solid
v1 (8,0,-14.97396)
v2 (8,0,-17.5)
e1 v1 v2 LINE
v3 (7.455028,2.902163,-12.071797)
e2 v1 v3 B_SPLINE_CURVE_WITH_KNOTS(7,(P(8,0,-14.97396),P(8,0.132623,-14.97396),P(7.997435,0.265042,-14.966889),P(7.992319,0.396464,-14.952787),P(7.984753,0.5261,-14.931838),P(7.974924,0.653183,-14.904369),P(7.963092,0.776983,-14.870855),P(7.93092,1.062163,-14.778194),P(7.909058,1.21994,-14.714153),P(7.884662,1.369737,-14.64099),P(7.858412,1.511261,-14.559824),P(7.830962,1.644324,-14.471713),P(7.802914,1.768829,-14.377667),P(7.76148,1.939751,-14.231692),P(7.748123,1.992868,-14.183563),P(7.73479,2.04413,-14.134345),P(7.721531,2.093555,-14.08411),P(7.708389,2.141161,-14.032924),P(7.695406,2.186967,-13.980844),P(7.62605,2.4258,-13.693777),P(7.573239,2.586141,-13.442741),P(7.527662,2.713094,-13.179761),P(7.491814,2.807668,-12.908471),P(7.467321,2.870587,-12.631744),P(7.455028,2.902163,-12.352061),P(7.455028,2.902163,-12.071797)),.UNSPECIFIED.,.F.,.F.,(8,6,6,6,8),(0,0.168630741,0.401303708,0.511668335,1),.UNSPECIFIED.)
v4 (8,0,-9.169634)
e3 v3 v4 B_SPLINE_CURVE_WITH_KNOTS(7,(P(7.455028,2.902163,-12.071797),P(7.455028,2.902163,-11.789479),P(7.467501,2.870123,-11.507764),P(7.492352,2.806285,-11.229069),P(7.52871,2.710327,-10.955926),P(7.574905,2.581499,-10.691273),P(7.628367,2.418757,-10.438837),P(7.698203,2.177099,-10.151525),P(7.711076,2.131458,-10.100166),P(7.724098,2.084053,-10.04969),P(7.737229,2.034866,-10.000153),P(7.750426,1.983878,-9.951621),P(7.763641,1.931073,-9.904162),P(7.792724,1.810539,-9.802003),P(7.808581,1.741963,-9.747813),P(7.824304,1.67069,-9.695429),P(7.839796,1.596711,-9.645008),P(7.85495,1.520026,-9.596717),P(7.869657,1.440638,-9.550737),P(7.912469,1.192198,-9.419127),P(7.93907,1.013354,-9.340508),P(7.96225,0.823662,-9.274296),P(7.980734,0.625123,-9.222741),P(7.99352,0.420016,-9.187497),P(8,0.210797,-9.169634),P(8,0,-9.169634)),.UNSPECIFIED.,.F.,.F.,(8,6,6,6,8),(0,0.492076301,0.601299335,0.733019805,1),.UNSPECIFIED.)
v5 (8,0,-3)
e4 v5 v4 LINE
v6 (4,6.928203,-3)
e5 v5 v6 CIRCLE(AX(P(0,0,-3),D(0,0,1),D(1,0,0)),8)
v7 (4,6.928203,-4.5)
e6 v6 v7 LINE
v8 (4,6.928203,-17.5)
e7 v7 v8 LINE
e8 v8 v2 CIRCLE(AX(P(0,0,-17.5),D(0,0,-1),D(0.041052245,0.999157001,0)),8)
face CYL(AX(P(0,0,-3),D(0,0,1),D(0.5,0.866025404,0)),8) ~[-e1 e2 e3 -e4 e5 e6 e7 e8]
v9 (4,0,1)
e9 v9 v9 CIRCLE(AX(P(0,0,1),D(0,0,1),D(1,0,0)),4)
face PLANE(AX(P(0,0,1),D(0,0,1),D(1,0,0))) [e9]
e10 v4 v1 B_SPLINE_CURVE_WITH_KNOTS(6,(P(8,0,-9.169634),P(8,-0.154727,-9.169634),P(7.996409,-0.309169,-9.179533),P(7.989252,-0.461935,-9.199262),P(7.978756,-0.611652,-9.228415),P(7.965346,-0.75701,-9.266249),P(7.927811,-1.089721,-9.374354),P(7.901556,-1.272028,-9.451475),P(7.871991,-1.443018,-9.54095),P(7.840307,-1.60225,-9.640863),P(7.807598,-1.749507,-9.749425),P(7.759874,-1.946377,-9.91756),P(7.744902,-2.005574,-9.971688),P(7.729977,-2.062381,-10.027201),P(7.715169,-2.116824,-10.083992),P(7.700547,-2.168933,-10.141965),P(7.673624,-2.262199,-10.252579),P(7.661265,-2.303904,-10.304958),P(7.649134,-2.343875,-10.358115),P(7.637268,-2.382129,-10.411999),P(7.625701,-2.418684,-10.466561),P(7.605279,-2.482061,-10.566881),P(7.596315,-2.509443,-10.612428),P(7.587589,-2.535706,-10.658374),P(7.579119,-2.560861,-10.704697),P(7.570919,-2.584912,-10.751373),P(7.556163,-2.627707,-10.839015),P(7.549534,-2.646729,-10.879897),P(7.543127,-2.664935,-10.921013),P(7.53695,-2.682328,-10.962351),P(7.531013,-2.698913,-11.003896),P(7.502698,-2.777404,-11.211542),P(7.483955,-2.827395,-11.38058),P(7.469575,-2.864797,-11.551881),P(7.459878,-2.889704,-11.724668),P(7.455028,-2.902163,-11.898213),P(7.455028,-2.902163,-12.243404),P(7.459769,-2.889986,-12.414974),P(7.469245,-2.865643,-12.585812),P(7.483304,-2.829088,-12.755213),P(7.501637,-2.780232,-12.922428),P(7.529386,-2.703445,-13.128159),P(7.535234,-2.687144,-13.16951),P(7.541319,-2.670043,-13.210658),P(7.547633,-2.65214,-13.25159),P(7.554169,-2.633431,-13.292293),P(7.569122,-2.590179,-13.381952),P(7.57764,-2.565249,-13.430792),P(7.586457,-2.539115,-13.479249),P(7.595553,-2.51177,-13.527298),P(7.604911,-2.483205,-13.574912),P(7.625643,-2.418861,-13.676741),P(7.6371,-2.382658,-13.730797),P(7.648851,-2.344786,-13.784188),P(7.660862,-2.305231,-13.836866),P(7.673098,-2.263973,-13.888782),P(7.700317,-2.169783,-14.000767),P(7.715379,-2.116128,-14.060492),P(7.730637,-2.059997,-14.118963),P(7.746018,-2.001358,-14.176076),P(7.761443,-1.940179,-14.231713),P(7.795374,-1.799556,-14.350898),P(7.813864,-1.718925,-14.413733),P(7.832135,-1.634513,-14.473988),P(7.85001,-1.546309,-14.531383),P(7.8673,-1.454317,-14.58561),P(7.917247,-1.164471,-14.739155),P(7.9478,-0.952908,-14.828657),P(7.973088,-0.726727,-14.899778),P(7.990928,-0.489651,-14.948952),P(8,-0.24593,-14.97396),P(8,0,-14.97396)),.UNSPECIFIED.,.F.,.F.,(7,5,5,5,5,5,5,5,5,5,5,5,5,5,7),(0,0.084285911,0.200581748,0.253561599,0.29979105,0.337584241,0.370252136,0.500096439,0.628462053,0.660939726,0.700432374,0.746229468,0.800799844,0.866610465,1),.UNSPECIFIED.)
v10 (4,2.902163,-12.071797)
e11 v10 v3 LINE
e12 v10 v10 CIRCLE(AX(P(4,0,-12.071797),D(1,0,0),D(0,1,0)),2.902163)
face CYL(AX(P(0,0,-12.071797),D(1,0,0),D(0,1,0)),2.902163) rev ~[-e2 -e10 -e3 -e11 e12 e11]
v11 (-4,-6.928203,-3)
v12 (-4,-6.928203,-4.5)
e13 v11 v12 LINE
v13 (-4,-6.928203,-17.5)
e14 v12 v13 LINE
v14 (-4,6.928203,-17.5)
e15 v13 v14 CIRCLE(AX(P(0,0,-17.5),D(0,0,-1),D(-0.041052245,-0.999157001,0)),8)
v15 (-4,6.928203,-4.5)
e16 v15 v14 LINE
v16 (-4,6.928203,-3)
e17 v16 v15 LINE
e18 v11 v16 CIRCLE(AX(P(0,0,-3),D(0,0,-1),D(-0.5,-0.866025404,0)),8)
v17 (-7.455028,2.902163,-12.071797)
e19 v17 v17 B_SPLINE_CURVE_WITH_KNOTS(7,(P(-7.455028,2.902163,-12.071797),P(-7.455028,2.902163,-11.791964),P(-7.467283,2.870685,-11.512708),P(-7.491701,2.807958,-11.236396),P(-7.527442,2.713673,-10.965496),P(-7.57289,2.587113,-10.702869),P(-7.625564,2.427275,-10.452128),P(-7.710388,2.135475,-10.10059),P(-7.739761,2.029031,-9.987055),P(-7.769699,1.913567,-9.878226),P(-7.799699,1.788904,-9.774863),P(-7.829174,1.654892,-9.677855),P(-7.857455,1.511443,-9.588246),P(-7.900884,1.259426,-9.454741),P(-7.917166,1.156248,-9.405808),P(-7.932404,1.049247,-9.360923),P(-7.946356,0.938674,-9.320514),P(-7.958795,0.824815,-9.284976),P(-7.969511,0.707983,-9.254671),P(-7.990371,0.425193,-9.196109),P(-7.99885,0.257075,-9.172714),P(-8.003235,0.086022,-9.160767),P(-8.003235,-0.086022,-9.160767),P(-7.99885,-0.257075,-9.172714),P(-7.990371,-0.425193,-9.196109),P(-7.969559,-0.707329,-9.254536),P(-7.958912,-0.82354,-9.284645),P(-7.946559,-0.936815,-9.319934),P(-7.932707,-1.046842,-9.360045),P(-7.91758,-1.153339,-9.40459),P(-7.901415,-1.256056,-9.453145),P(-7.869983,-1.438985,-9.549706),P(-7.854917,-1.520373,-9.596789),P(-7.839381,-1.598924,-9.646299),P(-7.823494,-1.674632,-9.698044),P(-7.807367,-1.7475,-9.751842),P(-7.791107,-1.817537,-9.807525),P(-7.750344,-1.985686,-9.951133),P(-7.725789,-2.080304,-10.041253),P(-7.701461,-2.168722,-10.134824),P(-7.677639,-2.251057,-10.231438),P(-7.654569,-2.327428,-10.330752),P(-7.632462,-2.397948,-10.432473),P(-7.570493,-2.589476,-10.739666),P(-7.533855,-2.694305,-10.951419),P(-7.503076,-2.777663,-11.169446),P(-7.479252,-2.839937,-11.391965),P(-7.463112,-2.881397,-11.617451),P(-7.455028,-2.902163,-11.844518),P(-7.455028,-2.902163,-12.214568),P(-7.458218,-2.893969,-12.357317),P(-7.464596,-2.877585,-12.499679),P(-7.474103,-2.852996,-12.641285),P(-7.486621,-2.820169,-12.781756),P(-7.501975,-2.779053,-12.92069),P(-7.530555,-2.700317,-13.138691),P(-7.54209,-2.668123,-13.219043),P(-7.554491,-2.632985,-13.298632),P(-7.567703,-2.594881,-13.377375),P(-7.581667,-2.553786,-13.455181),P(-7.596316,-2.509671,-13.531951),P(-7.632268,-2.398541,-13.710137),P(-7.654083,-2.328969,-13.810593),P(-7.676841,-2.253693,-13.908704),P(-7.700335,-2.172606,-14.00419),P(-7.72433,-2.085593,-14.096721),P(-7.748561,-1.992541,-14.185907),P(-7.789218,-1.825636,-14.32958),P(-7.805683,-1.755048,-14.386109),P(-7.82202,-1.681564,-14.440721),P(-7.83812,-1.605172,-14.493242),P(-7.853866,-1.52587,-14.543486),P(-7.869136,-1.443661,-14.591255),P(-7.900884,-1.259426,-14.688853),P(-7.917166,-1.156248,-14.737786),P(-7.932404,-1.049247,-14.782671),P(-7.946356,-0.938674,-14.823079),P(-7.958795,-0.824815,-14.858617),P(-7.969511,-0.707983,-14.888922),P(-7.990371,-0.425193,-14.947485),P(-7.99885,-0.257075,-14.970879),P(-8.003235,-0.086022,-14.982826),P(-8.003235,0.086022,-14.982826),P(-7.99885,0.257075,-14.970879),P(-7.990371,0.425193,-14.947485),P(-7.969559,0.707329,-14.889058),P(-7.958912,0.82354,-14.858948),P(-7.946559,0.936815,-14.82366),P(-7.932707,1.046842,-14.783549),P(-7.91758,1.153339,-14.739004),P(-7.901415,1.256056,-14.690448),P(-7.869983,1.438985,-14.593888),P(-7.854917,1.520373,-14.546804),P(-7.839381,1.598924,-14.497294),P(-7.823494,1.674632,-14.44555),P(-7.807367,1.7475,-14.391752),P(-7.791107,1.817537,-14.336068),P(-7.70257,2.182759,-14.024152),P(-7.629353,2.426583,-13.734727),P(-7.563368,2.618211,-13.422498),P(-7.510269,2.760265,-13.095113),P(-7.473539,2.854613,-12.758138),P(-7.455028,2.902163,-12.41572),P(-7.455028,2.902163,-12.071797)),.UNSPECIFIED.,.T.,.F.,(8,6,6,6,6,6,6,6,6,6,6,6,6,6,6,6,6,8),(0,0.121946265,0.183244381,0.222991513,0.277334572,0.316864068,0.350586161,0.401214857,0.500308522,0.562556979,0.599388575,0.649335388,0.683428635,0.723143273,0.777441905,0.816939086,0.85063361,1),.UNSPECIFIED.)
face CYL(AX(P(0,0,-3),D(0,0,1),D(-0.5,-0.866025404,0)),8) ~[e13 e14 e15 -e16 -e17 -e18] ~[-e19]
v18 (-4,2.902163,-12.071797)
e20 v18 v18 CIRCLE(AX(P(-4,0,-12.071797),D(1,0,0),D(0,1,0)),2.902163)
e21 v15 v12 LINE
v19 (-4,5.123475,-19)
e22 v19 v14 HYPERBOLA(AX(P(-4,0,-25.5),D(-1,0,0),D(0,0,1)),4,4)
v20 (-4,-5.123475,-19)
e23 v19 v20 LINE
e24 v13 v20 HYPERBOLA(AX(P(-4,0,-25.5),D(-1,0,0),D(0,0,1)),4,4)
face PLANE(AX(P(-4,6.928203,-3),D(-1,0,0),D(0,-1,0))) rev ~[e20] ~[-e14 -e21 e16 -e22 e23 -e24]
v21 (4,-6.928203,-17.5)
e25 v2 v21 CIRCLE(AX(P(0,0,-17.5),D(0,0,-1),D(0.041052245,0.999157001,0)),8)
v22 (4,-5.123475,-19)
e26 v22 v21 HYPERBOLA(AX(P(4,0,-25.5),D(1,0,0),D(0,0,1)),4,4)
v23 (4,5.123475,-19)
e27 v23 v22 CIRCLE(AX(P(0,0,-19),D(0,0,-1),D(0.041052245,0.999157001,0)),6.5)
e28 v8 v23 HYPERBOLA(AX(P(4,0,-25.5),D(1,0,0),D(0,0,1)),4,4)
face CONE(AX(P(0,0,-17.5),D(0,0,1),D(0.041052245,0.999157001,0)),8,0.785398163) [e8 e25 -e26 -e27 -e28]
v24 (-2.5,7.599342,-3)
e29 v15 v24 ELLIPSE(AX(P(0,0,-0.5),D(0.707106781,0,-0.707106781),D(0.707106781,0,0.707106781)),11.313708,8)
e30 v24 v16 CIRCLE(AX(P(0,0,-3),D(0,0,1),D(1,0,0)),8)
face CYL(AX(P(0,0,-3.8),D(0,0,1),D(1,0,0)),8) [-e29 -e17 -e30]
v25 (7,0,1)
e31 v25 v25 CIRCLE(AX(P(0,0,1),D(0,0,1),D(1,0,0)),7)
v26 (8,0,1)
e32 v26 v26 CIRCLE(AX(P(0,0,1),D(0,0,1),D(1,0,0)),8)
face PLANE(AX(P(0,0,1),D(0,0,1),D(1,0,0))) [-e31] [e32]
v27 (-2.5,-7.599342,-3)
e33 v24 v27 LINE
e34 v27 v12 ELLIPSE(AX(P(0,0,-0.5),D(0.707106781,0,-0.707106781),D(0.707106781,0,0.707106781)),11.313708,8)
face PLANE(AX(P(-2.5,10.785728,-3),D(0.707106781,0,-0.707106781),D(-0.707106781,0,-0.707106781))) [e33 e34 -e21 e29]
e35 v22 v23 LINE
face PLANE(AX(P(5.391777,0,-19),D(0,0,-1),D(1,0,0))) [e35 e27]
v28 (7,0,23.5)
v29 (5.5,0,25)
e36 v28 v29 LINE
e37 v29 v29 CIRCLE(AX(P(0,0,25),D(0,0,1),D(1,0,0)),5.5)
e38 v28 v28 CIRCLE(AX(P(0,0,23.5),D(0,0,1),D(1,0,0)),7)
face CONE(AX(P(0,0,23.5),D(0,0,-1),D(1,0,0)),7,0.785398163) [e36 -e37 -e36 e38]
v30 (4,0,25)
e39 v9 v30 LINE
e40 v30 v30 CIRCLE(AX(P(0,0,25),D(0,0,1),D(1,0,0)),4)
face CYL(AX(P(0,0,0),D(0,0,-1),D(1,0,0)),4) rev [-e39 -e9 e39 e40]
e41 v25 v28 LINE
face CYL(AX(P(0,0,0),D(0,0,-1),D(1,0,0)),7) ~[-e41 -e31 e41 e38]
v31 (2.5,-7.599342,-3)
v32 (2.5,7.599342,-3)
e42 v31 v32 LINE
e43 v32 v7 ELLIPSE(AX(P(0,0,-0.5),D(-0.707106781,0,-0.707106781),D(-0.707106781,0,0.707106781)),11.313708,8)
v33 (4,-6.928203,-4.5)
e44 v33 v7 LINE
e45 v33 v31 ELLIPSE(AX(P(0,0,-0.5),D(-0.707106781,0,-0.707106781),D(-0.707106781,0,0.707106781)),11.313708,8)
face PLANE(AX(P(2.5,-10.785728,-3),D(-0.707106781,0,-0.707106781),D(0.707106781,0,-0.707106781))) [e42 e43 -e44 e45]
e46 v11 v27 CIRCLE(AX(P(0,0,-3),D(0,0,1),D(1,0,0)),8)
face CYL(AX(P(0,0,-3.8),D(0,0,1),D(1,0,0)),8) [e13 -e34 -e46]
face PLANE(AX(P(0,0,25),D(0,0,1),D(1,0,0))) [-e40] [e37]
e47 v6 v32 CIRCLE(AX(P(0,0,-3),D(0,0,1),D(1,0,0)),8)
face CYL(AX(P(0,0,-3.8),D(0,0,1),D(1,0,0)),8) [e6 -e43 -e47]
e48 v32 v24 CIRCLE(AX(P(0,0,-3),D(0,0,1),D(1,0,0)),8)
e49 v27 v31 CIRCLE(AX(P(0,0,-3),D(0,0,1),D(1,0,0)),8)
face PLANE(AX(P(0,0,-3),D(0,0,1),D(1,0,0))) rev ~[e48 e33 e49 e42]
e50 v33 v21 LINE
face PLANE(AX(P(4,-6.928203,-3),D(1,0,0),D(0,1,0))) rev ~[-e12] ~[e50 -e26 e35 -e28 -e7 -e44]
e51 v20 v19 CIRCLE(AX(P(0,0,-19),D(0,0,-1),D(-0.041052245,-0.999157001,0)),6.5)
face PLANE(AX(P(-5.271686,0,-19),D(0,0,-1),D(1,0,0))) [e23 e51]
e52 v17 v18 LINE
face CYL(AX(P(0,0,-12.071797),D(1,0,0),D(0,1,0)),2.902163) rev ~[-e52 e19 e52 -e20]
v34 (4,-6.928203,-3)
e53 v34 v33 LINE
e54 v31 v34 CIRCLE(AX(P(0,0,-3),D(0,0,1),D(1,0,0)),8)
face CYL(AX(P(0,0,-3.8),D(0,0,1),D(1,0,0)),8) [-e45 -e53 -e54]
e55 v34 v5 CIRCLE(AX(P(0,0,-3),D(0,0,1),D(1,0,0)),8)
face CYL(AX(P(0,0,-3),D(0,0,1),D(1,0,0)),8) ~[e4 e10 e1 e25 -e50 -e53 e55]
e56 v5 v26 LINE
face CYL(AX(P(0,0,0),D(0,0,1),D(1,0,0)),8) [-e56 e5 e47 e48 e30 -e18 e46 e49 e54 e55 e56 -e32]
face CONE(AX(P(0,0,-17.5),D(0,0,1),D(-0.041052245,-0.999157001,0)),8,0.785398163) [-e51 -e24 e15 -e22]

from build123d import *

# Parameters (mm, degrees)
F7_R          = 7
F7_R_2        = 4
F8_DEPTH      = 25
F9_DEPTH      = 1
F7_R_3        = 8
F10_DEPTH     = 1
F11_DEPTH     = 3
F13_DEPTH     = 16
F14_R         = 2.9021632183
F15_DEPTH     = 12.5
F16_T4_DEPTH  = 21.5714554244
F16_S5_R      = 8
F16_T6_DEPTH  = 12
F16_T10_DEPTH = 21.5714554244
F16_S11_R     = 8
F16_T12_DEPTH = 12
F16_T16_ANGLE = 175.2944368931
F16_T18_ANGLE = 175.2944368931


# Not quite as in the source:
# - a fillet or chamfer that OpenCascade refuses, or shapes differently, is made with other operations: its cross-section is extruded or revolved along the edge and cut away or added


with BuildPart() as f8:
    # F7 (on Top) → F8 (new body)
    with BuildSketch(Plane.XY):
        Circle(F7_R)
        Circle(F7_R_2, mode=Mode.SUBTRACT)
    extrude(amount=F8_DEPTH)

    # F7 (on Top) → F9 (join)
    with BuildSketch(Plane.XY):
        Circle(F7_R_2)
    extrude(amount=F9_DEPTH)

    # F7 (on Top) → F10 (join)
    with BuildSketch(Plane.XY):
        Circle(F7_R_3)
        Circle(F7_R, mode=Mode.SUBTRACT)
    extrude(amount=F10_DEPTH)

    # F7 (on Top) → F11 (join)
    with BuildSketch(Plane.XY):
        Circle(F7_R_3)
        Circle(F7_R, mode=Mode.SUBTRACT)
        Circle(F7_R)
        Circle(F7_R_2, mode=Mode.SUBTRACT)
        Circle(F7_R_2)
    extrude(amount=-F11_DEPTH)

    # F12 (on face) → F13 (join)
    with BuildSketch(Plane(origin=(0, 0, -3), x_dir=(1, 0, 0), z_dir=(0, 0, -1))):
        with BuildLine():
            Line((-4, -6.9282032303), (-4, 6.9282032303))
            ThreePointArc((-4, 6.9282032303), (-8, 0), (-4, -6.9282032303))
        make_face()
        with BuildLine():
            ThreePointArc((8, 0), (6.9282032303, 4), (4, 6.9282032303))
            Line((4, 6.9282032303), (4, -6.9282032303))
            ThreePointArc((4, -6.9282032303), (6.9282032303, -4), (8, 0))
        make_face()
    extrude(amount=F13_DEPTH)

    # F14 (on Right) → F15 (cut, symmetric)
    with BuildSketch(Plane.YZ):
        with Locations((0, -12.0717967697)):
            Circle(F14_R)
    extrude(amount=F15_DEPTH, both=True, mode=Mode.SUBTRACT)

    # F16: chamfer of 1.5 on 5 edges, made by hand


with BuildPart() as f16_tool2:
    # F16_s3 → F16_t4 (new body)
    with BuildSketch(Plane.XZ.offset(10.7857277122)):
        Polygon((2.5, -3), (4, -4.5), (4, -3), align=None)
    extrude(amount=-F16_T4_DEPTH)

    # F16_s5 → F16_t6 (intersect, symmetric)
    with BuildSketch(Plane.XY.offset(-3.8)):
        Circle(F16_S5_R)
    extrude(amount=F16_T6_DEPTH, both=True, mode=Mode.INTERSECT)


with BuildPart() as f8_1:
    add(f8.part)

    # F16_t1: union F16_tool2
    add(f16_tool2.part)


with BuildPart() as f16_tool8:
    # F16_s9 → F16_t10 (new body)
    with BuildSketch(Plane.XZ.offset(-10.7857277122)):
        Polygon((-2.5, -3), (-4, -4.5), (-4, -3), align=None)
    extrude(amount=F16_T10_DEPTH)

    # F16_s11 → F16_t12 (intersect, symmetric)
    with BuildSketch(Plane.XY.offset(-3.8)):
        Circle(F16_S11_R)
    extrude(amount=F16_T12_DEPTH, both=True, mode=Mode.INTERSECT)


with BuildPart() as f8_2:
    add(f8_1.part)

    # F16_t7: union F16_tool8
    add(f16_tool8.part)

    # F16_s13 → F16_t14 (revolve, cut)
    with BuildSketch(Plane.XZ):
        Polygon((7, 23.5), (5.5, 25), (7, 25), align=None)
    revolve(axis=Axis((0, 0, 25), (0, 0, 1)), mode=Mode.SUBTRACT)

    # F16_s15 → F16_t16 (revolve, cut)
    with BuildSketch(Plane(origin=(0, 0, 0), x_dir=(0, 0, 1), z_dir=(-0.9991570013, 0.0410522451, 0))):
        Polygon((-17.5, 8), (-19, 6.5), (-19, 8), align=None)
    revolve(axis=Axis((0, 0, -19), (0, 0, -1)), revolution_arc=F16_T16_ANGLE, mode=Mode.SUBTRACT)

    # F16_s17 → F16_t18 (revolve, cut)
    with BuildSketch(Plane(origin=(0, 0, 0), x_dir=(0, 0, 1), z_dir=(0.9991570013, -0.0410522451, 0))):
        Polygon((-17.5, 8), (-19, 6.5), (-19, 8), align=None)
    revolve(axis=Axis((0, 0, -19), (0, 0, -1)), revolution_arc=F16_T18_ANGLE, mode=Mode.SUBTRACT)


solid = f8_2.part
